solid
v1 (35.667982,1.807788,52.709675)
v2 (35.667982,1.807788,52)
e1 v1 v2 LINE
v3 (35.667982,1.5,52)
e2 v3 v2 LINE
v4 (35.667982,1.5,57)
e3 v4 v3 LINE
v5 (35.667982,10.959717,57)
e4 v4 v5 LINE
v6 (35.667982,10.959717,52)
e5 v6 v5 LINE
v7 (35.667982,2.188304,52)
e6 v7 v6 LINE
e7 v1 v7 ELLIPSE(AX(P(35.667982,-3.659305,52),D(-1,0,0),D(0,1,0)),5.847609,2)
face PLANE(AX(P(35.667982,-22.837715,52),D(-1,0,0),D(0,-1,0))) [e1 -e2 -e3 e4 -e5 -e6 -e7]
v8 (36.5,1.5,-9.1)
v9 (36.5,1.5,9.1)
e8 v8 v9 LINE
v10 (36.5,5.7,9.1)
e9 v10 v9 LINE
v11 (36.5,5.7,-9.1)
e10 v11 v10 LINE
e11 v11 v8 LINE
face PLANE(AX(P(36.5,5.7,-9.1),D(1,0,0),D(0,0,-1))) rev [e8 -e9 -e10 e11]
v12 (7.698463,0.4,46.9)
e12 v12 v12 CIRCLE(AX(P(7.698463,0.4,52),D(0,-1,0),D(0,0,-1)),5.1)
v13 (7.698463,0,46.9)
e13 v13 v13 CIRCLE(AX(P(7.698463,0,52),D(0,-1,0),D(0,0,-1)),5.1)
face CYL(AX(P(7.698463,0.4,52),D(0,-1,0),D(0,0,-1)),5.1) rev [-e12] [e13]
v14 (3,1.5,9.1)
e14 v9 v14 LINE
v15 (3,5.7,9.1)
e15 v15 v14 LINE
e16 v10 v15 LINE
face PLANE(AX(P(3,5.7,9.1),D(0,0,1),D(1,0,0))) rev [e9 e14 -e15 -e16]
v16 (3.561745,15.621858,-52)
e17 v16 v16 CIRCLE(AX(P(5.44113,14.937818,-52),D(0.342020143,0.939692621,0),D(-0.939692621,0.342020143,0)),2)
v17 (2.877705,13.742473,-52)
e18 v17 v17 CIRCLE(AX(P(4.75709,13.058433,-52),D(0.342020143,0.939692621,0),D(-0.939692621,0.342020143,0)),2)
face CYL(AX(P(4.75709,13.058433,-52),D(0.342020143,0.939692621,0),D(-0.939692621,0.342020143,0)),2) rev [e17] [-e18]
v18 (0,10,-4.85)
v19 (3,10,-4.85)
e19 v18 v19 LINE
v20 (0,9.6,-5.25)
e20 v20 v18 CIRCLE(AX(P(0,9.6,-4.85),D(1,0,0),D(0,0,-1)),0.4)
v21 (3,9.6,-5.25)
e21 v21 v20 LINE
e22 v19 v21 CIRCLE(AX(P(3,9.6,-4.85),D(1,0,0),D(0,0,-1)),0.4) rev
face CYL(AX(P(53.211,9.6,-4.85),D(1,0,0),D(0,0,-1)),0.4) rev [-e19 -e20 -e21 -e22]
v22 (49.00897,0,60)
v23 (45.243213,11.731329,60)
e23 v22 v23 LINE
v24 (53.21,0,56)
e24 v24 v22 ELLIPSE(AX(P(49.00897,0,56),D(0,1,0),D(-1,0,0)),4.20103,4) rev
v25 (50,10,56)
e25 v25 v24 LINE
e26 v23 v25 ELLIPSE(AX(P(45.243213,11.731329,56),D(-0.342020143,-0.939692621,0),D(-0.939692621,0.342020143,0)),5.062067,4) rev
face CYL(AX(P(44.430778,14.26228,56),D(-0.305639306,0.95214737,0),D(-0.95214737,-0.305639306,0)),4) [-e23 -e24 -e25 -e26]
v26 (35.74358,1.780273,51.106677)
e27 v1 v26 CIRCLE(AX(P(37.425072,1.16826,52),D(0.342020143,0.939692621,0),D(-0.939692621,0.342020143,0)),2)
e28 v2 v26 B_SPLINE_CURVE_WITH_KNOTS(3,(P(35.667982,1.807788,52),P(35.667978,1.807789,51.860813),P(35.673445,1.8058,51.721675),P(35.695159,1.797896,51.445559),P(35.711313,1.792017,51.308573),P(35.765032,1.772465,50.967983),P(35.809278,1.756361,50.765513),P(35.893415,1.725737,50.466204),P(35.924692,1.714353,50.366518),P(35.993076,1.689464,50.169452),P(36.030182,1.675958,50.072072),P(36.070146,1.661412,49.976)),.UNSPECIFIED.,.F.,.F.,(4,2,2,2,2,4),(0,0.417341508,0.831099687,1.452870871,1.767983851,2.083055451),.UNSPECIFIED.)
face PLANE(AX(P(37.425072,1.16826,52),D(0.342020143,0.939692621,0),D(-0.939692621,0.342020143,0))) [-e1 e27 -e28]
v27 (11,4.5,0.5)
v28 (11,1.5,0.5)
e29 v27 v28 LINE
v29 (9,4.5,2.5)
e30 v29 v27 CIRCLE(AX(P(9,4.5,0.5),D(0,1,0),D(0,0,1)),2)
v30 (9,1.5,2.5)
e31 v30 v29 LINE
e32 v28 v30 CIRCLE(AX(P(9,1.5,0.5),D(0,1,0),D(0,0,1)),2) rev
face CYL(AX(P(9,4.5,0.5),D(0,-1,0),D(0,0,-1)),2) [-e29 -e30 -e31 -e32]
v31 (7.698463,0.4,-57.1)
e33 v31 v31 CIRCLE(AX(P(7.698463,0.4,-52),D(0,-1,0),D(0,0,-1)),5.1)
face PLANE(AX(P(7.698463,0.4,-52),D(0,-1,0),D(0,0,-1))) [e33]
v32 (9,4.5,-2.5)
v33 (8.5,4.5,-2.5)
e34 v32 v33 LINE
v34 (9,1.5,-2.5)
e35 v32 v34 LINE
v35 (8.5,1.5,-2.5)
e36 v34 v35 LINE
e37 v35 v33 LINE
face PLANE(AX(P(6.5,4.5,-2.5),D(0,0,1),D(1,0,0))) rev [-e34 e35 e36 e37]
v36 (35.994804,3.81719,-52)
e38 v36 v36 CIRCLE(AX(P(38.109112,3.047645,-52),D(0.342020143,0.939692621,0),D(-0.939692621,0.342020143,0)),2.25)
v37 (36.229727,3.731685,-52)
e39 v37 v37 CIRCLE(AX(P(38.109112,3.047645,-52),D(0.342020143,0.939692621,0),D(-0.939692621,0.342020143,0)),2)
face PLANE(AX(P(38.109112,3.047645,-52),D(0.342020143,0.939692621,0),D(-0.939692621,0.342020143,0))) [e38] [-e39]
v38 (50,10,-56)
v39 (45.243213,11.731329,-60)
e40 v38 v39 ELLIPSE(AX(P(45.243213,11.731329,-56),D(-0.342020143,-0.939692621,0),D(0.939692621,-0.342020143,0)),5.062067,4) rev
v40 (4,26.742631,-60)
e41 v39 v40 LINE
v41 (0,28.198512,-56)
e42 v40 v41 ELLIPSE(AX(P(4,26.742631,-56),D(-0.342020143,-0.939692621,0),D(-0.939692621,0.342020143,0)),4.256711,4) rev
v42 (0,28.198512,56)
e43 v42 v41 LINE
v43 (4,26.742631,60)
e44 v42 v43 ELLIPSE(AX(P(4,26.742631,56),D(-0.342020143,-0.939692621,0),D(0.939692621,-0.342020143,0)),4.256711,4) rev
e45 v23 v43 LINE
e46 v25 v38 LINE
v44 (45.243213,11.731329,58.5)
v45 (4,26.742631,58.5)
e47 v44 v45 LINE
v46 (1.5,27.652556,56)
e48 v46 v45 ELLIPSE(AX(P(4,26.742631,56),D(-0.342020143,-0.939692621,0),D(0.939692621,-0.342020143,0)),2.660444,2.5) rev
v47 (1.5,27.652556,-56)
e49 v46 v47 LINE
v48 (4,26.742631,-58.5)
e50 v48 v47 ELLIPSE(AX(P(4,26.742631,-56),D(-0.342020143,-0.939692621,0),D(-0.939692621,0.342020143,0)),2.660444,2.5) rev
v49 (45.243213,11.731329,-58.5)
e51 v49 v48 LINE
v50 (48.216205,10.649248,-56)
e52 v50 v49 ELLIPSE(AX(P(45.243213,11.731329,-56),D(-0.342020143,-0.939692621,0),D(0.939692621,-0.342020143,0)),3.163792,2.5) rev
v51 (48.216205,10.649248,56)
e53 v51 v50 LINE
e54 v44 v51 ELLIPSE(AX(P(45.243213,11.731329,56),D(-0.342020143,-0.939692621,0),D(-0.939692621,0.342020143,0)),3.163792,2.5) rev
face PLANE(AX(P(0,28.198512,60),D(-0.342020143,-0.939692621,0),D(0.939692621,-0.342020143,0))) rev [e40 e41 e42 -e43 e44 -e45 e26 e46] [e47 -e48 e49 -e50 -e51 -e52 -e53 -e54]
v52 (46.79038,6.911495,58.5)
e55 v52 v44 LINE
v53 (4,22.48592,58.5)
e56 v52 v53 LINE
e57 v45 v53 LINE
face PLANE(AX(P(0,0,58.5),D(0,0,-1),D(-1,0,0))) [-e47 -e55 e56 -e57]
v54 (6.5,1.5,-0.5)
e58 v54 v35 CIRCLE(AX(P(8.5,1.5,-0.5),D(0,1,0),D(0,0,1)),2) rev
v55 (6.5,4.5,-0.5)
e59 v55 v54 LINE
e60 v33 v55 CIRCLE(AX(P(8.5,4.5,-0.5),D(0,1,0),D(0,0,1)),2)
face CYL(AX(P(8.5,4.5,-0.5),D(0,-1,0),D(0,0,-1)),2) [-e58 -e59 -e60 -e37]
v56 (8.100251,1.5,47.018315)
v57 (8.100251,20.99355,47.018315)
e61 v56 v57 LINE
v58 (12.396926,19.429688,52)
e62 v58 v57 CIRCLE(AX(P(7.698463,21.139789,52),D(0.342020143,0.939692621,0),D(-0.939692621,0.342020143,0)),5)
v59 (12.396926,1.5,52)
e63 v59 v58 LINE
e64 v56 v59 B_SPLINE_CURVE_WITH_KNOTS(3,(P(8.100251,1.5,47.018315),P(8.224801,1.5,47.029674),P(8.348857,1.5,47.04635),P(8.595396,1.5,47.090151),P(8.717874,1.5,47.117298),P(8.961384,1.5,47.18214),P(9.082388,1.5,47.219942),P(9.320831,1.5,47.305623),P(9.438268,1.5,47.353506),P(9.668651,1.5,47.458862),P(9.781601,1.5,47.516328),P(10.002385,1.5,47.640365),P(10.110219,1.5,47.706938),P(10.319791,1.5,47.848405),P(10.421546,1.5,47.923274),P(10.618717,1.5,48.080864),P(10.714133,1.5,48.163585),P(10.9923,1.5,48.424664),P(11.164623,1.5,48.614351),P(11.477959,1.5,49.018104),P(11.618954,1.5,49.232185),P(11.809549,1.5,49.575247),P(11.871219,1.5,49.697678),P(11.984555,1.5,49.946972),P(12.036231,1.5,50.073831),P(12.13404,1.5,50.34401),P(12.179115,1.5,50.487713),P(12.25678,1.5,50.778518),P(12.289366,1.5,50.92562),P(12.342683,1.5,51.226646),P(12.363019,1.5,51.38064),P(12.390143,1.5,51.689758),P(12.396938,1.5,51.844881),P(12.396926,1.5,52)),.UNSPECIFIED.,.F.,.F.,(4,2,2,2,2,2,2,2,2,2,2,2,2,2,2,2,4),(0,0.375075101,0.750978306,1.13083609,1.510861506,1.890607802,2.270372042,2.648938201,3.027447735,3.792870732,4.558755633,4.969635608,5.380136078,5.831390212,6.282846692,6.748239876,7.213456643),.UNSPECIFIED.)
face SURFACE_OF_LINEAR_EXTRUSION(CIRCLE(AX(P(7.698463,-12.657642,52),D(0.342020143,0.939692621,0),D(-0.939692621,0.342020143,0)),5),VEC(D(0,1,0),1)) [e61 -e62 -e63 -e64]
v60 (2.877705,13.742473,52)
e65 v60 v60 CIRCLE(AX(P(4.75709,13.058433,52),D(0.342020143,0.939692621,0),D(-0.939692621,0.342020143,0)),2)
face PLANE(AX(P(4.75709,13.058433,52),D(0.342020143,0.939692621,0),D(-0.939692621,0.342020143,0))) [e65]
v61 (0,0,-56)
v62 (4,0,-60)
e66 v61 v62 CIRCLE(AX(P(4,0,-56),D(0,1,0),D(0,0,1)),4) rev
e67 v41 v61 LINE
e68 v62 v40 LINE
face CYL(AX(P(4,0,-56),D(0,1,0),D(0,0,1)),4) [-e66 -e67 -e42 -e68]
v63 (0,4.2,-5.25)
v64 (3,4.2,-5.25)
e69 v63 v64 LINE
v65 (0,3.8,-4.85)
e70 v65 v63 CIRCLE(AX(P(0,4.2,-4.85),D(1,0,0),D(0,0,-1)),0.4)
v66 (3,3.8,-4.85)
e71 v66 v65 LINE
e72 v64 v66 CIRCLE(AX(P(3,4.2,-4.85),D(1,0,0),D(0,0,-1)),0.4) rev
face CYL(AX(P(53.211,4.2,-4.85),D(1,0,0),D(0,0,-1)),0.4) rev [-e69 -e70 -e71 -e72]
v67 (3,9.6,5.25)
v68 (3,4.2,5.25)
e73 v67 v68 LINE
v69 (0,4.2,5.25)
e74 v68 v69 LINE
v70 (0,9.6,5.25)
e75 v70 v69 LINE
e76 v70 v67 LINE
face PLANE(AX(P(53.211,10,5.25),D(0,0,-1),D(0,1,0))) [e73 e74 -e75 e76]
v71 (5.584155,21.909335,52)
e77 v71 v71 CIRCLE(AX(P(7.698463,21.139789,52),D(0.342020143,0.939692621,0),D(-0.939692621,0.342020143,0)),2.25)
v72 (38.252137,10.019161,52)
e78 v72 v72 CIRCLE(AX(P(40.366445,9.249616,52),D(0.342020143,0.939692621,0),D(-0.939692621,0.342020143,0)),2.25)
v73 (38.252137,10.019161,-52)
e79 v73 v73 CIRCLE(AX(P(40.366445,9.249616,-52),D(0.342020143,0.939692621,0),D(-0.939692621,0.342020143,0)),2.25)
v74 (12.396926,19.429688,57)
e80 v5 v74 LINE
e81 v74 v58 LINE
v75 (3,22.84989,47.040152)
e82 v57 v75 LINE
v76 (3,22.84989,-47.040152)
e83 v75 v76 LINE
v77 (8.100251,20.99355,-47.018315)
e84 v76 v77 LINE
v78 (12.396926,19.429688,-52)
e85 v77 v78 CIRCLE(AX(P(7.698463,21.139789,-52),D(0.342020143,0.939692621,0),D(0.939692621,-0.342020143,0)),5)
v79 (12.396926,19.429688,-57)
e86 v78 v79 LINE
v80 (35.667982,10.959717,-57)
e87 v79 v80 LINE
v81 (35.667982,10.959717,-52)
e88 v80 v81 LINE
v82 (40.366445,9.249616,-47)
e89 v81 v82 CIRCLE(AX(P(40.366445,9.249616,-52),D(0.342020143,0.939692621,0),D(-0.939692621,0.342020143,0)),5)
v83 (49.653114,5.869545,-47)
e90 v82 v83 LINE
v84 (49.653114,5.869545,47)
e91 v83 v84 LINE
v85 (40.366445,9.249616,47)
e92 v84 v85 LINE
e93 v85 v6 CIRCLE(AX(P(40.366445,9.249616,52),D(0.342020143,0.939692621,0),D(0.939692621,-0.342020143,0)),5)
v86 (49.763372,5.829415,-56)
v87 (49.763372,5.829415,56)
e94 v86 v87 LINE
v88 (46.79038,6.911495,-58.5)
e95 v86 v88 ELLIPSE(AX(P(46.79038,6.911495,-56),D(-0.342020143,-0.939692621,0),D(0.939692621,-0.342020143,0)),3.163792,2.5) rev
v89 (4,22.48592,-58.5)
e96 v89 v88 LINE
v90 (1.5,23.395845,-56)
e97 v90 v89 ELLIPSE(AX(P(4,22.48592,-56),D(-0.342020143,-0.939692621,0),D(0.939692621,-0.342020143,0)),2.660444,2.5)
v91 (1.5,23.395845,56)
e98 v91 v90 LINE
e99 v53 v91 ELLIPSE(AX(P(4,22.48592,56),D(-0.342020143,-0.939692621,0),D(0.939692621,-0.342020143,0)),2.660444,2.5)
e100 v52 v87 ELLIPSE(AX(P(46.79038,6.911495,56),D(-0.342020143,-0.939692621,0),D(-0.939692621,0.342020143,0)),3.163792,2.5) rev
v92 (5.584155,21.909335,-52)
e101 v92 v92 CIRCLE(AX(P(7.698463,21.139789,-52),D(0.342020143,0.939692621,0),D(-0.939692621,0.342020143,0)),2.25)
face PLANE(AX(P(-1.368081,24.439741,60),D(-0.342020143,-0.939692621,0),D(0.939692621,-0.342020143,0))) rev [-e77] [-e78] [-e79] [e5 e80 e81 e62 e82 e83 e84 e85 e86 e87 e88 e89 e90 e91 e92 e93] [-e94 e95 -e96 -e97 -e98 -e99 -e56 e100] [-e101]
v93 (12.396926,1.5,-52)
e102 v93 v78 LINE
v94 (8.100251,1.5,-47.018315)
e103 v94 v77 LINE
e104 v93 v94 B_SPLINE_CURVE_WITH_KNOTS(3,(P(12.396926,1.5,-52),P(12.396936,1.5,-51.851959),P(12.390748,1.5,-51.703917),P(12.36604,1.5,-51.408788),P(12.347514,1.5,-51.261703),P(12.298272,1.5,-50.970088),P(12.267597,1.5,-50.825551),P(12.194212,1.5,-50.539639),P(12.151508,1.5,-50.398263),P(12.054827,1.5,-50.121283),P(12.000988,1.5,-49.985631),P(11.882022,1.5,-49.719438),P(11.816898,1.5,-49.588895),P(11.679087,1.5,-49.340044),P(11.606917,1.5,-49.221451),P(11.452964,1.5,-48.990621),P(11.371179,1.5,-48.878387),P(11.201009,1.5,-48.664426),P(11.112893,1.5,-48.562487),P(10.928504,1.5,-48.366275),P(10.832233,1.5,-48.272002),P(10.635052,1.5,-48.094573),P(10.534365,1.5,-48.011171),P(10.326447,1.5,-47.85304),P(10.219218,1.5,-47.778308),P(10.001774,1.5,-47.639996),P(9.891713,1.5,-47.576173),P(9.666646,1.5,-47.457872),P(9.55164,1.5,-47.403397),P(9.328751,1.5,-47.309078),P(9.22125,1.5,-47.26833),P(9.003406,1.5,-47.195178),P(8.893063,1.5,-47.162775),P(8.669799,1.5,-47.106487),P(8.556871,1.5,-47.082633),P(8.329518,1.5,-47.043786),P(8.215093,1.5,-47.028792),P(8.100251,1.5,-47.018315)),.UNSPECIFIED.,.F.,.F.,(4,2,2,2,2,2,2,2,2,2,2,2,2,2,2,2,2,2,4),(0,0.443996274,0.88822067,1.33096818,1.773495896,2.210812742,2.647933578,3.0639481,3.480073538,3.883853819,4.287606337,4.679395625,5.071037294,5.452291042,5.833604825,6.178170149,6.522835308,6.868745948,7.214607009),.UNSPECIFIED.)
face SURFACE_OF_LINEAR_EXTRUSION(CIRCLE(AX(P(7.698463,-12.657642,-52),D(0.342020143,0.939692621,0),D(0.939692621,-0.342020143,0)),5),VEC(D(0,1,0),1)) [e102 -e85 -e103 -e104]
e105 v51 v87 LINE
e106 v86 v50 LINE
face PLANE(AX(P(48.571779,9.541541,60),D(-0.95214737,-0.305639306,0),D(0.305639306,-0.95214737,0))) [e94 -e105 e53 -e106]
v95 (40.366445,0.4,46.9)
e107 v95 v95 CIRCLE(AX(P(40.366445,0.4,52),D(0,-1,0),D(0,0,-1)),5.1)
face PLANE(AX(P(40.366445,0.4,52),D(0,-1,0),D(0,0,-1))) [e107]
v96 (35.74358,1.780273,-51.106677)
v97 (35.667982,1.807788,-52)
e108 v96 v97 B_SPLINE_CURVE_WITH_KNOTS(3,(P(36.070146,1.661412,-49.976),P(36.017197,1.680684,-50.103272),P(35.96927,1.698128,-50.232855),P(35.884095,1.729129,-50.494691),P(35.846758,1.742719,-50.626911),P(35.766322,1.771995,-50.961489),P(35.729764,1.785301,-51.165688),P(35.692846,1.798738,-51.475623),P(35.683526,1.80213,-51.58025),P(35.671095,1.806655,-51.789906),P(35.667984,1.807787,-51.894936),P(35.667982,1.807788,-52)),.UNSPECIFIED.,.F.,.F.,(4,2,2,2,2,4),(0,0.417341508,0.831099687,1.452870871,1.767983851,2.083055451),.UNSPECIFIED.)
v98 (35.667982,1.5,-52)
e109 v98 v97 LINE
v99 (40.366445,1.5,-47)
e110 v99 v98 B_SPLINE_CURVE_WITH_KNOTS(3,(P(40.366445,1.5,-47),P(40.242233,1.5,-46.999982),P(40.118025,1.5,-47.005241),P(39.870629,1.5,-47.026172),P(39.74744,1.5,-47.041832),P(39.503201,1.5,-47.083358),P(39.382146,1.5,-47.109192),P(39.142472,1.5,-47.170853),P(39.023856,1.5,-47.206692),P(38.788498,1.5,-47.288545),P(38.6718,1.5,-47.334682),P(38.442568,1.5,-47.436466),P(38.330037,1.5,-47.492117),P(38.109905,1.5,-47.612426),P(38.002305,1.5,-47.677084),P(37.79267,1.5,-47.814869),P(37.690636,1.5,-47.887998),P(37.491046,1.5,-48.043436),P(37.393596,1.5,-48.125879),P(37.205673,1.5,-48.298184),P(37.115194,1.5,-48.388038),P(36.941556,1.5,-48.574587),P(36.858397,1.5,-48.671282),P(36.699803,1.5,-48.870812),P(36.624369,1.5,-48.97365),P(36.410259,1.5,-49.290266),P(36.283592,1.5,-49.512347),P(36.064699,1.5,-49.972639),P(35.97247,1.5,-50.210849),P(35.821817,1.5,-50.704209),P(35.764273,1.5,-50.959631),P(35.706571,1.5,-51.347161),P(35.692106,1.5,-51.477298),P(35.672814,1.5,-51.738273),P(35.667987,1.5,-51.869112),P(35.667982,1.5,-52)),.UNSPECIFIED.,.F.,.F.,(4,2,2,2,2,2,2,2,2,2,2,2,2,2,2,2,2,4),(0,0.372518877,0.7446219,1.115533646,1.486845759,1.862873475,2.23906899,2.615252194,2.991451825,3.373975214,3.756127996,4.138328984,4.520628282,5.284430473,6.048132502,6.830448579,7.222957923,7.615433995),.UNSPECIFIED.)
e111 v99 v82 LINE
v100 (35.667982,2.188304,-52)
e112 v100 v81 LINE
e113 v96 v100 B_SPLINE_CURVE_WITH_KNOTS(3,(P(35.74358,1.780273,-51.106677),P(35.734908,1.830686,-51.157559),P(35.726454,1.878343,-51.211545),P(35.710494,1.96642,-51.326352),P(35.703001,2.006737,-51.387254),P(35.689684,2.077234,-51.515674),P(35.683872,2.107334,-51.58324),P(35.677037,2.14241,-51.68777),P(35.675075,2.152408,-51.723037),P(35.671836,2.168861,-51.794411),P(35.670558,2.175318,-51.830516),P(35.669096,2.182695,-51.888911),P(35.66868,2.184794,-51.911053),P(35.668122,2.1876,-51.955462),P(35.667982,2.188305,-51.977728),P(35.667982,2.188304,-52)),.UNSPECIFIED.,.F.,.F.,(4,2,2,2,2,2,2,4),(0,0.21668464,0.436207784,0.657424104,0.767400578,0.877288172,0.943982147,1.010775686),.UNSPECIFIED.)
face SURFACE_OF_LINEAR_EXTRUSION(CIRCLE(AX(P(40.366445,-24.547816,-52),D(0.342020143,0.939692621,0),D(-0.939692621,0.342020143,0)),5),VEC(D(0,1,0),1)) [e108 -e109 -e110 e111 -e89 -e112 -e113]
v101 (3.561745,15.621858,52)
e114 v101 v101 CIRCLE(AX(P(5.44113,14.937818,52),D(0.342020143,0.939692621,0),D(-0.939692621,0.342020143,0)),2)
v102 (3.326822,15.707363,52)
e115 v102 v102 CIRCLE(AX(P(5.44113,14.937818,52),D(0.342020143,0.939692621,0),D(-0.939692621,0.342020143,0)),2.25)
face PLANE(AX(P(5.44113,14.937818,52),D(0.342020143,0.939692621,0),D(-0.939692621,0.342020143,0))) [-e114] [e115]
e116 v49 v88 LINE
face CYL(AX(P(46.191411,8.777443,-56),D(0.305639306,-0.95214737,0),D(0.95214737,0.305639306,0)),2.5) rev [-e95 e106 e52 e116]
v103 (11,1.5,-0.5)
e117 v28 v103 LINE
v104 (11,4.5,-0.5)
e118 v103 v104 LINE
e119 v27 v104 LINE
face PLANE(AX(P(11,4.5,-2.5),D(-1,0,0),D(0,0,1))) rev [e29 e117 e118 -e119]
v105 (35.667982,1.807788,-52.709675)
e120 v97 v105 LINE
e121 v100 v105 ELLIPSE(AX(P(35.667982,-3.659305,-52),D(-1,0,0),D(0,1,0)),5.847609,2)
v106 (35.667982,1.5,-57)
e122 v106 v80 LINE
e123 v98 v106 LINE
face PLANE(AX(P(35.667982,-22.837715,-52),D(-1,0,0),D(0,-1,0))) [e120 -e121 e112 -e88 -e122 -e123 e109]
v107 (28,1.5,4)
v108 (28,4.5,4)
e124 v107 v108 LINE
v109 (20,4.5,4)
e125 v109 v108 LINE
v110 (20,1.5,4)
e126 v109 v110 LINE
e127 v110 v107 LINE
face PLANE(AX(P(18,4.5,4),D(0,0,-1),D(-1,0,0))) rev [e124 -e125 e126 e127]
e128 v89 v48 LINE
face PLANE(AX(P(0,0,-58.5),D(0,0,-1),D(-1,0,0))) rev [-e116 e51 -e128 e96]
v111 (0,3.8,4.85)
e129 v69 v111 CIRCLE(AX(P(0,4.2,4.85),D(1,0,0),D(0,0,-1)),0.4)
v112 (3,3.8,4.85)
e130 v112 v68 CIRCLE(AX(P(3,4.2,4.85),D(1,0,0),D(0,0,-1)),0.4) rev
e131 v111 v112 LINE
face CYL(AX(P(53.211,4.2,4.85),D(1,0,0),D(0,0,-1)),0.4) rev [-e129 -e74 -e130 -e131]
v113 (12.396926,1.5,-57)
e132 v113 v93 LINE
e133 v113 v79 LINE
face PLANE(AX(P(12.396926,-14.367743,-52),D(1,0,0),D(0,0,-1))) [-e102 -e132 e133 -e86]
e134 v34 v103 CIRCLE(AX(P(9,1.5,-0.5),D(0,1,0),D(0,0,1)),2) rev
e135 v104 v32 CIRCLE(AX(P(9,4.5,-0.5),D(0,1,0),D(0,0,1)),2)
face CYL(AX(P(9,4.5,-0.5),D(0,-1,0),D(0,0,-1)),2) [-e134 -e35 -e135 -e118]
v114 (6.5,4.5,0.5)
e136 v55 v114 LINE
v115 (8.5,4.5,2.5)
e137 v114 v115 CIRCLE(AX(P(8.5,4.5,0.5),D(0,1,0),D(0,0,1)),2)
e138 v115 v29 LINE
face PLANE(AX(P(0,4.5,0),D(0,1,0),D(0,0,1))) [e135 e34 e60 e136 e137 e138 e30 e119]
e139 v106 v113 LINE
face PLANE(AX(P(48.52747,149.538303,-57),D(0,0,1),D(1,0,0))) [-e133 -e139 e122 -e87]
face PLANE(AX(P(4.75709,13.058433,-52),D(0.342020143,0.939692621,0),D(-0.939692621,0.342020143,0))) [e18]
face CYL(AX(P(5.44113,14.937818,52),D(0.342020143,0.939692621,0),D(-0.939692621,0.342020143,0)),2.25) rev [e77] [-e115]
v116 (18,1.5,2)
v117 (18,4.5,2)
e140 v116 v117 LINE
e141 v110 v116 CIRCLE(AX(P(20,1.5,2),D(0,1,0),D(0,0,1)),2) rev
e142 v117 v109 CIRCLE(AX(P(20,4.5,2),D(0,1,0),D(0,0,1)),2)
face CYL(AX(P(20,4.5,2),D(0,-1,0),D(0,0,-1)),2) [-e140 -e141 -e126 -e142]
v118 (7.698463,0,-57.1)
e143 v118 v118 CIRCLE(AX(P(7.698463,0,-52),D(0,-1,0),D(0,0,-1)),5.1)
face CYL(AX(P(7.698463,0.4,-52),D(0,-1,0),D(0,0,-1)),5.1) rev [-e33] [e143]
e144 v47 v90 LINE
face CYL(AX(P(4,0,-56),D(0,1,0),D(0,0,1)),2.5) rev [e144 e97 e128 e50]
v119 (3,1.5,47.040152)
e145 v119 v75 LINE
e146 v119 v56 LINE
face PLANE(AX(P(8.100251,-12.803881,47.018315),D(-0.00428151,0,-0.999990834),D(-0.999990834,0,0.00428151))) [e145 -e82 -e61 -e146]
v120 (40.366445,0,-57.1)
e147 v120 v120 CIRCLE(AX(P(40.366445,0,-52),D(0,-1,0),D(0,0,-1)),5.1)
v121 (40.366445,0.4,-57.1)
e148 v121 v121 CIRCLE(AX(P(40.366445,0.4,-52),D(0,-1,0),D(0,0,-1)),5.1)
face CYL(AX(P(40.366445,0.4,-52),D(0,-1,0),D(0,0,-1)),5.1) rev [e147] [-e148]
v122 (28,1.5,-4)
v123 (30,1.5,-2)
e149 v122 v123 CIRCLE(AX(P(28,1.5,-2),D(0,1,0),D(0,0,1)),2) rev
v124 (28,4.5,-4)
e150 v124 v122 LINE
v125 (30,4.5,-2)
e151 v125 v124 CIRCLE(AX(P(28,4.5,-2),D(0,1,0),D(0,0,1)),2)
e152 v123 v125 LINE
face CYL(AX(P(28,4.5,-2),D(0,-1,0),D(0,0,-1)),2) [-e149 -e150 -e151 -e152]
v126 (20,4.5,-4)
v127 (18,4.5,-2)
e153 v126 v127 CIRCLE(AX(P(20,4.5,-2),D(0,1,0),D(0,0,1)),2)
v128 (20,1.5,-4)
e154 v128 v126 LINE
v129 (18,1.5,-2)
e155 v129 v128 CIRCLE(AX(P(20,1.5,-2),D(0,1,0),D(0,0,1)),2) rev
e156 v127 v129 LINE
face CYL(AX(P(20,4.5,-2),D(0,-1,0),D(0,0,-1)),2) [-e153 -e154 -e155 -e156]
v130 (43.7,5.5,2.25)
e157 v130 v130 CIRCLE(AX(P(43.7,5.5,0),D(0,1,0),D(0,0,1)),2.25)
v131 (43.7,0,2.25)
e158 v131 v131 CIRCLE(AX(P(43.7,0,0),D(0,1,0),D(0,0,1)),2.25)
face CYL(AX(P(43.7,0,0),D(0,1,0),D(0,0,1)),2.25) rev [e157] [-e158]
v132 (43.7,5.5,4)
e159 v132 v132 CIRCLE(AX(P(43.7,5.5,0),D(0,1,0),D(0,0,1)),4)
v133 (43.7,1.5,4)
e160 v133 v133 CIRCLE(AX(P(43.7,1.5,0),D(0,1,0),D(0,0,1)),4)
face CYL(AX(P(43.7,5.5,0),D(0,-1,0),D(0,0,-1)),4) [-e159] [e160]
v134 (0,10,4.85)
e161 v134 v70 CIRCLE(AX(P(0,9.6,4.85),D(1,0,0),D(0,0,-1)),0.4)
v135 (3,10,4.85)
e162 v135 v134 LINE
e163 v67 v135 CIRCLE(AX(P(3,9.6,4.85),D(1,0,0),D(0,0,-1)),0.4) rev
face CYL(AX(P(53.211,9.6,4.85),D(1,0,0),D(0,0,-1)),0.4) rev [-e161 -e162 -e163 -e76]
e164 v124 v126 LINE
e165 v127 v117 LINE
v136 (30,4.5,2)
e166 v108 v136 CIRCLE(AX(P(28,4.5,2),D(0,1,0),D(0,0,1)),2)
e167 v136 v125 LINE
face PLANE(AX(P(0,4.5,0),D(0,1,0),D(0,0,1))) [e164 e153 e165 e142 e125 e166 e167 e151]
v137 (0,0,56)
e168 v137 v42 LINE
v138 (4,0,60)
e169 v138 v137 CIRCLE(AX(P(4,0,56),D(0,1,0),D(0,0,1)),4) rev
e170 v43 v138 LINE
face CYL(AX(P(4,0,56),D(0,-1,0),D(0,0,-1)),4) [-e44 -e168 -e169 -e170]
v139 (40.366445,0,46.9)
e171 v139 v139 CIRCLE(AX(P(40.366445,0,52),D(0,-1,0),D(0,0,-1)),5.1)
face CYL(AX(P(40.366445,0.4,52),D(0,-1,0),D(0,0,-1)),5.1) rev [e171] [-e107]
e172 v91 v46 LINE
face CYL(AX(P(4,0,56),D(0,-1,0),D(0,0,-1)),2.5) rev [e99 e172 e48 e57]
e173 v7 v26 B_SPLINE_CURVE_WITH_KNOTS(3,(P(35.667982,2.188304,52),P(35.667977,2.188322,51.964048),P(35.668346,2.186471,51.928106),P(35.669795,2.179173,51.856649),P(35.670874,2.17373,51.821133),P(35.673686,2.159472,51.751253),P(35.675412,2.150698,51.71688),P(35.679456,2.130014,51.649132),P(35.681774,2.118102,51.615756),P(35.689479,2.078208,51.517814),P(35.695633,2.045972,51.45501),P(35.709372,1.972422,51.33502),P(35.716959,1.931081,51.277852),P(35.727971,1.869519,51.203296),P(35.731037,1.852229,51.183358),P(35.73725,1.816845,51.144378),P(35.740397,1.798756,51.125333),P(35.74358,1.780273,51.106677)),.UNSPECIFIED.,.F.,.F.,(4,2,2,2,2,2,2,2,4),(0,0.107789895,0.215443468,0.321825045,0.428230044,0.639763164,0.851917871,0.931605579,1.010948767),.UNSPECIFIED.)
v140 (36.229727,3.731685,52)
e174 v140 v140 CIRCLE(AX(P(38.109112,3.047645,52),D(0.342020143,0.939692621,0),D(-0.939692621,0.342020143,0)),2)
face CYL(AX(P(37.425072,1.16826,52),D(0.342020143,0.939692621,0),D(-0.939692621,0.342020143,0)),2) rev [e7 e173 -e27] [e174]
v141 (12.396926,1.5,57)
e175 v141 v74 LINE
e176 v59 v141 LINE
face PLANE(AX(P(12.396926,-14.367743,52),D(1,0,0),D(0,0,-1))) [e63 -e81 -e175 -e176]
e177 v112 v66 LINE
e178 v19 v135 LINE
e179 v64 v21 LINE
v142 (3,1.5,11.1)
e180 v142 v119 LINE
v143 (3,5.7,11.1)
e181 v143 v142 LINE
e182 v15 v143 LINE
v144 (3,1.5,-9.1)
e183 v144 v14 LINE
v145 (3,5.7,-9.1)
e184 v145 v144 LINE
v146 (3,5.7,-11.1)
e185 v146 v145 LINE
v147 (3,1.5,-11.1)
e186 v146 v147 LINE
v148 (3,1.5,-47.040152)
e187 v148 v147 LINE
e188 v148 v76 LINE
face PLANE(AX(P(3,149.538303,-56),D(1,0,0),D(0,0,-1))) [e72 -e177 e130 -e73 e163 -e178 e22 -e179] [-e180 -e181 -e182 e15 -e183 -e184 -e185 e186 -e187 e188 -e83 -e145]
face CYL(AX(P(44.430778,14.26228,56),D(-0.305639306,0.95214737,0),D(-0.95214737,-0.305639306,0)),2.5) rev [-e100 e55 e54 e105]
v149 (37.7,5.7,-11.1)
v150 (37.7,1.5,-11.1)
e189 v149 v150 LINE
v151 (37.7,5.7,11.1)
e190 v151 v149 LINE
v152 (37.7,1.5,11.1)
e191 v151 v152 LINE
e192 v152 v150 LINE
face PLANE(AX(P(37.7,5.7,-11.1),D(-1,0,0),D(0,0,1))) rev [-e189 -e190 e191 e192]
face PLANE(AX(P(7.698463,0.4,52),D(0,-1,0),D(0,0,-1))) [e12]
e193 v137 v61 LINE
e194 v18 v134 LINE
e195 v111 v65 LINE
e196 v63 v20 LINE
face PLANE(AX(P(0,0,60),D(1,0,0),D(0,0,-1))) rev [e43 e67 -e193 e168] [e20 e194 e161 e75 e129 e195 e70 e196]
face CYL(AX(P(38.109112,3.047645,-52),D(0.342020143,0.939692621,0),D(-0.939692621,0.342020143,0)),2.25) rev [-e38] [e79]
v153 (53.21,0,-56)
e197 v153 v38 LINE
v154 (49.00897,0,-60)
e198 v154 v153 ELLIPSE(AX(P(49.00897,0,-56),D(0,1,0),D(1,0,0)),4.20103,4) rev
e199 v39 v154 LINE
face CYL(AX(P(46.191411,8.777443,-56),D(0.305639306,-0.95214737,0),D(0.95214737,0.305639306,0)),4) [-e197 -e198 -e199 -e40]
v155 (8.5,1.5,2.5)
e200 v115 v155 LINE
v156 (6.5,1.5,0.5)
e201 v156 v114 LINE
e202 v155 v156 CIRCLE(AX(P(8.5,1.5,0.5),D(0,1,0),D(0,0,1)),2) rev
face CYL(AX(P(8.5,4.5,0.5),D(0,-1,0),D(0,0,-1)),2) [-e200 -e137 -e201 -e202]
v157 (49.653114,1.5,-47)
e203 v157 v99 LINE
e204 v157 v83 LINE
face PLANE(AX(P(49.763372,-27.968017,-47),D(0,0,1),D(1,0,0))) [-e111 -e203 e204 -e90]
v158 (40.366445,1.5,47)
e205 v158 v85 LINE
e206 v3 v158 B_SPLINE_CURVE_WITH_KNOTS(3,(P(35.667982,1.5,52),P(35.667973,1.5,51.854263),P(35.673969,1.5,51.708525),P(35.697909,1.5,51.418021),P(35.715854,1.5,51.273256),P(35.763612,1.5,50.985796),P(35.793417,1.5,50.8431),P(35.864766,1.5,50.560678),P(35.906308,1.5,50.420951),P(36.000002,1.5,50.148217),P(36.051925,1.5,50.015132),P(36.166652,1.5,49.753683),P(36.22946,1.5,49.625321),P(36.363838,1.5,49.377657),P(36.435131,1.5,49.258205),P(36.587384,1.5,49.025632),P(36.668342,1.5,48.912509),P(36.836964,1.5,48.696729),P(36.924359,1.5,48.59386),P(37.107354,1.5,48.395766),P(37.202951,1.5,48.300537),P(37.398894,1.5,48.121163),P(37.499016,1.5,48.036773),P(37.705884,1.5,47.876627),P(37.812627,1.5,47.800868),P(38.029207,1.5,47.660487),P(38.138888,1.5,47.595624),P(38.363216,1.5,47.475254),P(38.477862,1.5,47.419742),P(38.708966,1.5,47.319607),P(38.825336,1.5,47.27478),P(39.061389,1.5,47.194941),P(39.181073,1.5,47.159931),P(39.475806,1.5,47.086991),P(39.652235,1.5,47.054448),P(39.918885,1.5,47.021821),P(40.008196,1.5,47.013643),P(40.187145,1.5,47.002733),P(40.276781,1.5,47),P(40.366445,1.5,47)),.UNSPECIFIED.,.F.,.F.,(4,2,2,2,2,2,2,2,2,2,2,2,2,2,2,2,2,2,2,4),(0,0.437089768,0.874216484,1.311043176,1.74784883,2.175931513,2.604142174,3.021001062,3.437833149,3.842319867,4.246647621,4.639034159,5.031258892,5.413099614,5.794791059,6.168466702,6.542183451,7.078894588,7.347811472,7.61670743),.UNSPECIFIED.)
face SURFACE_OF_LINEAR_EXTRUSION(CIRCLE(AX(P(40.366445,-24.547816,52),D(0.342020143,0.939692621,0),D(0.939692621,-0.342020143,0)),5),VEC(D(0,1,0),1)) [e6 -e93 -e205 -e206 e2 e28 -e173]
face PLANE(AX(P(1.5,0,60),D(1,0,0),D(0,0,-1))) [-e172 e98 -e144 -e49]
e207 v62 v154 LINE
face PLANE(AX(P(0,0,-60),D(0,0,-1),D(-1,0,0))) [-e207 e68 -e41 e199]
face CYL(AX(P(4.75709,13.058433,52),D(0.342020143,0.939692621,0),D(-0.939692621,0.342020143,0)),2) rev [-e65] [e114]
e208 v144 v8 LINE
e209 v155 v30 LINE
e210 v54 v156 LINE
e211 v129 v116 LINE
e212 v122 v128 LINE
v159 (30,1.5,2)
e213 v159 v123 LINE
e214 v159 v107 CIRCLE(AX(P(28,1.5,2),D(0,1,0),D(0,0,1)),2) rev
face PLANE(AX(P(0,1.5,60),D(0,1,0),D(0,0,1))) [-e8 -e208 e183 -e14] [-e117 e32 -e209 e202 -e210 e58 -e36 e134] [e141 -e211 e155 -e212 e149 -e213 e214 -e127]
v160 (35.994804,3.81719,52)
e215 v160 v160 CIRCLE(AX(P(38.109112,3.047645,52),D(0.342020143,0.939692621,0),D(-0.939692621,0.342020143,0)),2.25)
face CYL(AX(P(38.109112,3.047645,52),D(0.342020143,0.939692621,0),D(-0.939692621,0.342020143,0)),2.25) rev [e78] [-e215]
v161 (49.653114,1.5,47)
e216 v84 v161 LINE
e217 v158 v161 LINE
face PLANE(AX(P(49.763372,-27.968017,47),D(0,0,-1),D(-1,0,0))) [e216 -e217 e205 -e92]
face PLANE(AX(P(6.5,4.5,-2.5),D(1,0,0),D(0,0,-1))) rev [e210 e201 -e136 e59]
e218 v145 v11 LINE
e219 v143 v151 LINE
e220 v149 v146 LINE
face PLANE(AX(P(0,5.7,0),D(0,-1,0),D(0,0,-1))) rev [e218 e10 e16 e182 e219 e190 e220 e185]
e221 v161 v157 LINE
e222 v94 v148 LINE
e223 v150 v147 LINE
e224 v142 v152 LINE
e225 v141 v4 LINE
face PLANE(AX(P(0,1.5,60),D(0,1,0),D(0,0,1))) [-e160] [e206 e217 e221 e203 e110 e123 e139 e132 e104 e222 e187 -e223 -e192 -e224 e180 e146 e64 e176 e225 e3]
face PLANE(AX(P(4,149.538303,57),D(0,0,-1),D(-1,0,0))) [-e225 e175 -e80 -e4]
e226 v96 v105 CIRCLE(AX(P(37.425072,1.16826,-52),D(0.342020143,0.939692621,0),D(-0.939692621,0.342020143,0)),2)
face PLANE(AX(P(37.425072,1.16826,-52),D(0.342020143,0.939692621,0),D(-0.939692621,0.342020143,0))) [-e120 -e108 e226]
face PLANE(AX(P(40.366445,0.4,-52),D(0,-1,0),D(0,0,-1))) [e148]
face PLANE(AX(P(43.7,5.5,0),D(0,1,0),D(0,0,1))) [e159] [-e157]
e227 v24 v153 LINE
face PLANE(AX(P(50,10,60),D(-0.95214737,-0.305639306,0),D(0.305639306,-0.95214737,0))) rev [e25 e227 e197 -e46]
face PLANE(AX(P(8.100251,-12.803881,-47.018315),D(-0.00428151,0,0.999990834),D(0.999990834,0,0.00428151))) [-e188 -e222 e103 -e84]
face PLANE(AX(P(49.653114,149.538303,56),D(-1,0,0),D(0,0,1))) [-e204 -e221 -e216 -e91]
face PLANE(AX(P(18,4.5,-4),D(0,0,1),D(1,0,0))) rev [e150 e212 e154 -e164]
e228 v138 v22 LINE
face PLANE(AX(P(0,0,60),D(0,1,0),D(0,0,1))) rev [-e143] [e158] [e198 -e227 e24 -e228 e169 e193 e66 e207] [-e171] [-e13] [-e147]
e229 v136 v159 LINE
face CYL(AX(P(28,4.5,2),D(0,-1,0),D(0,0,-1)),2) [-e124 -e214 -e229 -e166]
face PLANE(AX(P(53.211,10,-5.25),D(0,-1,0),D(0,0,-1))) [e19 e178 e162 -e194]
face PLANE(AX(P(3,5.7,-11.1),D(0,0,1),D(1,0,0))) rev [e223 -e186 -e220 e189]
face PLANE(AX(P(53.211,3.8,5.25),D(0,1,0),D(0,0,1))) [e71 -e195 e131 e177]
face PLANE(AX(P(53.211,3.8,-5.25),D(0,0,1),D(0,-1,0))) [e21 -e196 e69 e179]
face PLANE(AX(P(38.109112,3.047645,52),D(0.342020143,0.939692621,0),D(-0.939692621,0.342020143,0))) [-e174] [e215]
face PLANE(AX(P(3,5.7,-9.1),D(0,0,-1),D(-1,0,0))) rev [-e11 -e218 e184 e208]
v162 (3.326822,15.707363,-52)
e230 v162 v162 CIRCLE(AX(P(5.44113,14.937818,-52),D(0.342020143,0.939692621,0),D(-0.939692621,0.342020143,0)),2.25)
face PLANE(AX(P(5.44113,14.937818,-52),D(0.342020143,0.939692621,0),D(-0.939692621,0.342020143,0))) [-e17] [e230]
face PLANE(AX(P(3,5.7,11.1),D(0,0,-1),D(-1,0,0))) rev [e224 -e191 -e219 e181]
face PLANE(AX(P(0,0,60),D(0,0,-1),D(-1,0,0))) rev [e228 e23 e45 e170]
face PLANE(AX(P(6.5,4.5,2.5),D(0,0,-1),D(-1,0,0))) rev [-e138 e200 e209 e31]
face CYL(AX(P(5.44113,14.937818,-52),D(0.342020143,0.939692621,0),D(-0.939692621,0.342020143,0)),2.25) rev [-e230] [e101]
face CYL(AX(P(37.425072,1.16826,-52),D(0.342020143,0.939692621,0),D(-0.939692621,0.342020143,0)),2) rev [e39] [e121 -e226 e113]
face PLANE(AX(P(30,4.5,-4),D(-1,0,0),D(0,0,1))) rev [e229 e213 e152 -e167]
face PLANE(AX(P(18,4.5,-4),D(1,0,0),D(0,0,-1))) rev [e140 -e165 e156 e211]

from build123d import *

# Parameters (mm, degrees)
BOSS_EXTRU_1_DEPTH      = 60
CONG_1_R                = 4
COQUE1_T                = -1.5
BOSS_EXTRU_2_REACH      = 86.523
ESQUISSE5_W             = 12
ESQUISSE5_H             = 8
ESQUISSE5_W_2           = 4.5
ESQUISSE5_H_2           = 5
BOSS_EXTRU_3_DEPTH      = 3
ENL_V_MAT_EXTRU_2_REACH = 87.009
ESQUISSE6_W             = 10.5
ESQUISSE6_H             = 6.2
CONG_2_R                = 2
BOSS_EXTRU_4_DEPTH      = 4.2
ESQUISSE8_R             = 4
BOSS_EXTRU_5_DEPTH      = 4
ESQUISSE9_R             = 2.25
ENL_V_MAT_EXTRU_3_DEPTH = 84.345824934
BOSS_EXTRU_6_START      = 1
BOSS_EXTRU_6_DEPTH      = 18.429688487
BOSS_EXTRU_6_2_DEPTH    = 4.829414633
BOSS_EXTRU_6_START_2    = 47.018315389
BOSS_EXTRU_6_3_DEPTH    = 9.981684611
BOSS_EXTRU_6_START_3    = -57
BOSS_EXTRU_6_4_DEPTH    = 9.981684511
BOSS_EXTRU_6_START_4    = -47.020439353
BOSS_EXTRU_6_5_DEPTH    = 0.020439353
BOSS_EXTRU_6_START_5    = 47
BOSS_EXTRU_6_6_DEPTH    = 0.02055902
BOSS_EXTRU_6_START_6    = 5.829414633
BOSS_EXTRU_6_7_DEPTH    = 18.170585367
ESQUISSE11_R            = 2.25
ENL_V_MAT_EXTRU_4_DEPTH = 6.6
CONG_3_R                = 0.4
ESQUISSE14_R            = 2
ENL_V_MAT_EXTRU_6_DEPTH = 2
ESQUISSE15_R            = 5.1
ENL_V_MAT_EXTRU_7_DEPTH = 0.4


with BuildPart() as part:
    # Esquisse1 → Boss.-Extru.1 (new, symmetric)
    with BuildSketch(Plane.XY):
        Polygon((0, 0), (53.21, 0), (50, 10), (0, 28.198511713), align=None)
    extrude(amount=BOSS_EXTRU_1_DEPTH, both=True)

    # Congé1
    cong_1_edges = [part.edges().sort_by_distance(p)[0] for p in [
        (51.605, 5, 60),
        (0, 14.099255857, 60),
        (51.605, 5, -60),
        (0, 14.099255857, -60),
    ]]
    fillet(cong_1_edges, radius=CONG_1_R)

    # Coque1
    coque1_openings = [part.faces().sort_by_distance(p)[0] for p in [
        (24.994997427, 19.101076644, 0),
    ]]
    offset(amount=COQUE1_T, openings=coque1_openings, kind=Kind.INTERSECTION)

    # Boss.-Extru.2: up to this plane
    boss_extru_2_end = Plane(origin=(-1.368080573, 24.43974123, 60), z_dir=(-0.3420201433256695, -0.9396926207859081, 0))
    # Esquisse4 → Boss.-Extru.2 (add, up to the surface)
    with BuildSketch(Plane(origin=(0, 1.5, 0), x_dir=(1, 0, 0), z_dir=(0, 1, 0)), mode=Mode.PRIVATE) as boss_extru_2_sk1:
        with BuildLine():
            Line((51.153113619, -56), (51.153113619, 56))
            add(Edge.make_bspline(
                [(51.153113619, 56), (51.153113619, 58.5), (48.52746965, 58.5)],
                knots=[0, 0, 0, 1.570796327, 1.570796327, 1.570796327], degree=2, weights=[1, 0.707106781, 1]))
            Line((48.52746965, 58.5), (4, 58.5))
            ThreePointArc((4, 58.5), (2.232233047, 57.767766953), (1.5, 56))
            Line((1.5, 56), (1.5, -56))
            ThreePointArc((1.5, -56), (2.232233047, -57.767766953), (4, -58.5))
            Line((4, -58.5), (48.52746965, -58.5))
            add(Edge.make_bspline(
                [(48.52746965, -58.5), (51.153113619, -58.5), (51.153113619, -56)],
                knots=[1.570796327, 1.570796327, 1.570796327, 3.141592654, 3.141592654, 3.141592654], degree=2, weights=[1, 0.707106781, 1]))
        make_face()
        with BuildLine():
            Line((3, 56), (3, -56))
            ThreePointArc((3, -56), (3.292893219, -56.707106781), (4, -57))
            Line((4, -57), (48.52746965, -57))
            add(Edge.make_bspline(
                [(48.52746965, -57), (48.667862887, -57), (48.804503112, -56.977268476), (49.069620052, -56.884680006), (49.190562346, -56.817547726), (49.406120034, -56.637082098), (49.494089239, -56.528808181), (49.61932931, -56.278058054), (49.653113619, -56.140975451), (49.653113619, -56)],
                knots=[0, 0, 0, 0, 0.25, 0.25, 0.5, 0.5, 0.75, 0.75, 1, 1, 1, 1], degree=3))
            Line((49.653113619, -56), (49.653113619, 56))
            add(Edge.make_bspline(
                [(49.653113619, 56), (49.653113619, 56.140560164), (49.618987902, 56.278470031), (49.495168818, 56.526916657), (49.405339988, 56.637625841), (49.192348678, 56.816161002), (49.068961612, 56.884888289), (48.805496783, 56.97694309), (48.667615973, 57), (48.52746965, 57)],
                knots=[0, 0, 0, 0, 0.25, 0.25, 0.5, 0.5, 0.75, 0.75, 1, 1, 1, 1], degree=3))
            Line((48.52746965, 57), (4, 57))
            ThreePointArc((4, 57), (3.292893219, 56.707106781), (3, 56))
        make_face(mode=Mode.SUBTRACT)
    boss_extru_2_tool1 = split(extrude(boss_extru_2_sk1.sketch, amount=BOSS_EXTRU_2_REACH, mode=Mode.PRIVATE), bisect_by=boss_extru_2_end, keep=Keep.BOTH, mode=Mode.PRIVATE)
    add(boss_extru_2_tool1.solids().sort_by_distance((49.882113, 1.5, 0))[0])

    # Esquisse5 → Boss.-Extru.3 (add)
    with BuildSketch(Plane(origin=(0, 1.5, 0), x_dir=(1, 0, 0), z_dir=(0, 1, 0))):
        with Locations((24, 0)):
            Rectangle(ESQUISSE5_W, ESQUISSE5_H)
        with Locations((8.75, 0)):
            Rectangle(ESQUISSE5_W_2, ESQUISSE5_H_2)
    extrude(amount=BOSS_EXTRU_3_DEPTH)

    # Esquisse6 → Enlèv. mat.-Extru.2 (cut, up to next)
    with BuildSketch(Plane(origin=(0, 0, 0), x_dir=(0, 0, -1), z_dir=(1, 0, 0)), mode=Mode.PRIVATE) as enl_v_mat_extru_2_sk1:
        with Locations((0, 6.9)):
            Rectangle(ESQUISSE6_W, ESQUISSE6_H)
    enl_v_mat_extru_2_tool1 = extrude(enl_v_mat_extru_2_sk1.sketch, amount=ENL_V_MAT_EXTRU_2_REACH, mode=Mode.PRIVATE) & part.part
    add(enl_v_mat_extru_2_tool1.solids().sort_by_distance((0, 6.9, 0))[0], mode=Mode.SUBTRACT)

    # Congé2
    cong_2_edges = [part.edges().sort_by_distance(p)[0] for p in [
        (30, 3, 4),
        (30, 3, -4),
        (18, 3, -4),
        (18, 3, 4),
        (11, 3, 2.5),
        (11, 3, -2.5),
        (6.5, 3, -2.5),
        (6.5, 3, 2.5),
    ]]
    fillet(cong_2_edges, radius=CONG_2_R)

    # Esquisse7 → Boss.-Extru.4 (add)
    with BuildSketch(Plane(origin=(0, 1.5, 0), x_dir=(1, 0, 0), z_dir=(0, 1, 0))):
        Polygon((3, 9.1), (36.5, 9.1), (36.5, -9.1), (3, -9.1), (3, -11.1), (37.7, -11.1), (37.7, 11.1), (3, 11.1), align=None)
    extrude(amount=BOSS_EXTRU_4_DEPTH)

    # Esquisse8 → Boss.-Extru.5 (add)
    with BuildSketch(Plane(origin=(0, 1.5, 0), x_dir=(1, 0, 0), z_dir=(0, 1, 0))):
        with Locations(Location((43.7, 0, 0), (0, 0, 270))):
            Circle(ESQUISSE8_R)
    extrude(amount=BOSS_EXTRU_5_DEPTH)

    # Esquisse9 → Enlèv. mat.-Extru.3 (cut, through all)
    with BuildSketch(Plane(origin=(0, 5.5, 0), x_dir=(1, 0, 0), z_dir=(0, 1, 0))):
        with Locations(Location((43.7, 0, 0), (0, 0, 270))):
            Circle(ESQUISSE9_R)
    extrude(amount=-ENL_V_MAT_EXTRU_3_DEPTH, mode=Mode.SUBTRACT)

    # Boss.-Extru.6: read off the stored shape, not the designer's step
    # Boss.-Extru.6 outline → Boss.-Extru.6 (add)
    with BuildSketch(Plane(origin=(0, 0, 0), x_dir=(1, 0, 0), z_dir=(0, 1, 0)).offset(BOSS_EXTRU_6_START)):
        with BuildLine():
            Line((12.396926208, -57), (12.396926208, -52))
            add(Edge.make_bspline(
                [(12.396926208, -52), (12.396926208, -47.41076307), (8.100251137, -47.018315489)],
                knots=[3.141592654, 3.141592654, 3.141592654, 4.626769632, 4.626769632, 4.626769632], degree=2, weights=[1, 0.7367207, 1]))
            Line((8.100251137, -47.018315489), (3, -47.040152465))
            Line((3, -47.040152465), (3, -56))
            ThreePointArc((3, -56), (3.292893219, -56.707106781), (4, -57))
            Line((4, -57), (12.396926208, -57))
        make_face()
        with BuildLine():
            Line((3, 56), (3, 47.040152465))
            Line((3, 47.040152465), (8.100251137, 47.018315489))
            add(Edge.make_bspline(
                [(8.100251137, 47.018315489), (12.396926208, 47.41076307), (12.396926208, 52)],
                knots=[4.798008329, 4.798008329, 4.798008329, 6.283185307, 6.283185307, 6.283185307], degree=2, weights=[1, 0.7367207, 1]))
            Line((12.396926208, 52), (12.396926208, 57))
            Line((12.396926208, 57), (4, 57))
            ThreePointArc((4, 57), (3.292893219, 56.707106781), (3, 56))
        make_face()
    extrude(amount=BOSS_EXTRU_6_DEPTH)

    # Boss.-Extru.6 2 outline → Boss.-Extru.6 2 (add)
    with BuildSketch(Plane(origin=(0, 0, 0), x_dir=(1, 0, 0), z_dir=(0, 1, 0)).offset(BOSS_EXTRU_6_START)):
        with BuildLine():
            Line((35.66798221, -52), (35.66798221, -57))
            Line((35.66798221, -57), (48.52746965, -57))
            add(Edge.make_bspline(
                [(48.52746965, -57), (48.667862887, -57), (48.804503112, -56.977268476), (49.069620052, -56.884680006), (49.190562346, -56.817547726), (49.406120034, -56.637082098), (49.494089239, -56.528808181), (49.61932931, -56.278058054), (49.653113619, -56.140975451), (49.653113619, -56)],
                knots=[0, 0, 0, 0, 0.25, 0.25, 0.5, 0.5, 0.75, 0.75, 1, 1, 1, 1], degree=3))
            Line((49.653113619, -56), (49.653113619, -47))
            Line((49.653113619, -47), (40.366445314, -47))
            add(Edge.make_bspline(
                [(40.366445314, -47), (35.66798221, -47), (35.66798221, -52)],
                knots=[1.570796327, 1.570796327, 1.570796327, 3.141592654, 3.141592654, 3.141592654], degree=2, weights=[1, 0.707106781, 1]))
        make_face()
        with BuildLine():
            Line((40.366445314, 47), (49.653113619, 47))
            Line((49.653113619, 47), (49.653113619, 56))
            add(Edge.make_bspline(
                [(49.653113619, 56), (49.653113619, 56.140560164), (49.618987902, 56.278470031), (49.495168818, 56.526916657), (49.405339988, 56.637625841), (49.192348678, 56.816161002), (49.068961612, 56.884888289), (48.805496783, 56.97694309), (48.667615973, 57), (48.52746965, 57)],
                knots=[0, 0, 0, 0, 0.25, 0.25, 0.5, 0.5, 0.75, 0.75, 1, 1, 1, 1], degree=3))
            Line((48.52746965, 57), (35.66798221, 57))
            Line((35.66798221, 57), (35.66798221, 52))
            add(Edge.make_bspline(
                [(35.66798221, 52), (35.66798221, 47), (40.366445314, 47)],
                knots=[0, 0, 0, 1.570796327, 1.570796327, 1.570796327], degree=2, weights=[1, 0.707106781, 1]))
        make_face()
    extrude(amount=BOSS_EXTRU_6_2_DEPTH)

    # Boss.-Extru.6 3 outline → Boss.-Extru.6 3 (add)
    with BuildSketch(Plane.XY.offset(BOSS_EXTRU_6_START_2)):
        Polygon((49.653113619, 5.869545228), (35.66798221, 10.959716783), (35.66798221, 5.829414633), (49.653113619, 5.829414633), align=None)
        Polygon((12.396926208, 19.429688487), (3, 22.849889921), (3, 19.429688487), align=None)
    extrude(amount=BOSS_EXTRU_6_3_DEPTH)

    # Boss.-Extru.6 4 outline → Boss.-Extru.6 4 (add)
    with BuildSketch(Plane.XY.offset(BOSS_EXTRU_6_START_3)):
        Polygon((49.653113619, 5.869545228), (35.66798221, 10.959716783), (35.66798221, 5.829414633), (49.653113619, 5.829414633), align=None)
        Polygon((12.396926208, 19.429688487), (3, 22.849889921), (3, 19.429688487), align=None)
    extrude(amount=BOSS_EXTRU_6_4_DEPTH)

    # Boss.-Extru.6 5 outline → Boss.-Extru.6 5 (add)
    with BuildSketch(Plane.XY.offset(BOSS_EXTRU_6_START_4)):
        Polygon((49.653113619, 5.869545228), (35.66798221, 10.959716783), (35.66798221, 5.829414633), (49.653113619, 5.829414633), align=None)
    extrude(amount=BOSS_EXTRU_6_5_DEPTH)

    # Boss.-Extru.6 6 outline → Boss.-Extru.6 6 (add)
    with BuildSketch(Plane.XY.offset(BOSS_EXTRU_6_START_5)):
        Polygon((49.653113619, 5.869545228), (35.66798221, 10.959716783), (35.66798221, 5.829414633), (49.653113619, 5.829414633), align=None)
    extrude(amount=BOSS_EXTRU_6_6_DEPTH)

    # Boss.-Extru.6 7 outline → Boss.-Extru.6 7 (cut)
    with BuildSketch(Plane(origin=(0, 0, 0), x_dir=(1, 0, 0), z_dir=(0, 1, 0)).offset(BOSS_EXTRU_6_START_6)):
        with BuildLine():
            add(Edge.make_bspline(
                [(8.100251137, 47.018315489), (12.396926208, 47.41076307), (12.396926208, 52)],
                knots=[4.798008329, 4.798008329, 4.798008329, 6.283185307, 6.283185307, 6.283185307], degree=2, weights=[1, 0.7367207, 1]))
            Line((8.100251137, 47.018315489), (12.396926208, 47.018315489))
            Line((12.396926208, 47.018315489), (12.396926208, 52))
        make_face()
        Polygon((3, 47.018315489), (8.100251137, 47.018315489), (3, 47.040152465), align=None)
        with BuildLine():
            Line((12.396926208, -47.018315389), (8.100251137, -47.018315489))
            add(Edge.make_bspline(
                [(12.396926208, -52), (12.396926208, -47.41076307), (8.100251137, -47.018315489)],
                knots=[3.141592654, 3.141592654, 3.141592654, 4.626769632, 4.626769632, 4.626769632], degree=2, weights=[1, 0.7367207, 1]))
            Line((12.396926208, -52), (12.396926208, -47.018315389))
        make_face()
        Polygon((3, -47.040152465), (8.100251137, -47.018315489), (3, -47.018315389), align=None)
        with BuildLine():
            Line((35.66798221, 52), (35.66798221, 47))
            Line((35.66798221, 47), (40.366445314, 47))
            add(Edge.make_bspline(
                [(40.366445314, 47), (40.287343772, 47), (40.207552732, 47.001771488), (40.127130137, 47.005376232), (40.046141109, 47.01087296), (39.960137963, 47.018728272), (39.95561712, 47.019147041), (39.951094768, 47.019571805), (39.946570918, 47.020002573), (38.657392353, 47.144432692), (37.175025071, 47.77425323), (36.091784284, 49.090919412), (35.66798221, 50.674633293), (35.66798221, 52)],
                knots=[1.477297963, 1.477297963, 1.477297963, 1.477297963, 1.477297963, 1.477297963, 1.570796327, 1.570796327, 1.570796327, 1.570796327, 1.575982007, 1.575982007, 1.575982007, 1.575982007, 3.04809429, 3.04809429, 3.04809429, 3.04809429, 3.04809429, 3.04809429], degree=5, weights=[1, 1, 1.000000146, 1.000000124, 1, 1, 1, 1, 1, 1, 0.971799078, 0.973721729, 1, 1]))
        make_face()
        with BuildLine():
            Line((40.366445314, -47), (35.66798221, -47))
            Line((35.66798221, -47), (35.66798221, -52))
            add(Edge.make_bspline(
                [(35.66798221, -52), (35.66798221, -50.674888732), (36.091611637, -49.09157995), (37.17437226, -47.775010339), (38.656309752, -47.144902002), (39.945581064, -47.020096933), (39.950352904, -47.019641537), (39.955123079, -47.019192821), (39.959891575, -47.018750776), (40.046141979, -47.010872901), (40.127130785, -47.005376203), (40.20755316, -47.001771478), (40.287343985, -47), (40.366445314, -47)],
                knots=[1.669764093, 1.669764093, 1.669764093, 1.669764093, 1.669764093, 1.669764093, 3.141592654, 3.141592654, 3.141592654, 3.141592654, 3.147062307, 3.147062307, 3.147062307, 3.147062307, 3.24056042, 3.24056042, 3.24056042, 3.24056042, 3.24056042, 3.24056042], degree=5, weights=[1, 1, 0.973743112, 0.971816525, 1, 1, 1, 1, 1, 1, 1.000000124, 1.000000146, 1, 1]))
        make_face()
    extrude(amount=BOSS_EXTRU_6_7_DEPTH, mode=Mode.SUBTRACT)

    # Esquisse11 → Enlèv. mat.-Extru.4 (cut)
    with BuildSketch(Plane(origin=(7.694746397, 21.141141975, 0), x_dir=(0.9396926207859082, -0.34202014332566943, 0), z_dir=(0.34202014332566943, 0.9396926207859082, 0))):
        with Locations(Location((0.003955237, -52, 0), (0, 0, 180))):
            Circle(ESQUISSE11_R)
        with Locations(Location((0.003955237, 52, 0), (0, 0, 180))):
            Circle(ESQUISSE11_R)
        with Locations(Location((34.768495776, 52, 0), (0, 0, 180))):
            Circle(ESQUISSE11_R)
        with Locations(Location((34.768495776, -52, 0), (0, 0, 180))):
            Circle(ESQUISSE11_R)
    extrude(amount=-ENL_V_MAT_EXTRU_4_DEPTH, mode=Mode.SUBTRACT)

    # Congé3
    cong_3_edges = [part.edges().sort_by_distance(p)[0] for p in [
        (1.5, 3.8, -5.25),
        (1.5, 10, 5.25),
        (1.5, 3.8, 5.25),
        (1.5, 10, -5.25),
    ]]
    fillet(cong_3_edges, radius=CONG_3_R)

    # Esquisse14 → Enlèv. mat.-Extru.6 (cut)
    with BuildSketch(Plane(origin=(5.437413451, 14.939170677, 0), x_dir=(0.9396926207859082, -0.34202014332566943, 0), z_dir=(0.34202014332566943, 0.9396926207859082, 0))):
        with Locations(Location((0.003955237, -52, 0), (0, 0, 180))):
            Circle(ESQUISSE14_R)
        with Locations(Location((34.768495776, -52, 0), (0, 0, 180))):
            Circle(ESQUISSE14_R)
        with Locations(Location((0.003955237, 52, 0), (0, 0, 180))):
            Circle(ESQUISSE14_R)
        with Locations(Location((34.768495776, 52, 0), (0, 0, 180))):
            Circle(ESQUISSE14_R)
    extrude(amount=-ENL_V_MAT_EXTRU_6_DEPTH, mode=Mode.SUBTRACT)

    # Esquisse15 → Enlèv. mat.-Extru.7 (cut)
    with BuildSketch(Plane.XZ):
        with Locations(Location((7.698463104, 52, 0), (0, 0, 270))):
            Circle(ESQUISSE15_R)
        with Locations(Location((40.366445314, 52, 0), (0, 0, 270))):
            Circle(ESQUISSE15_R)
        with Locations(Location((7.698463104, -52, 0), (0, 0, 270))):
            Circle(ESQUISSE15_R)
        with Locations(Location((40.366445314, -52, 0), (0, 0, 270))):
            Circle(ESQUISSE15_R)
    extrude(amount=-ENL_V_MAT_EXTRU_7_DEPTH, mode=Mode.SUBTRACT)


solid = part.part
